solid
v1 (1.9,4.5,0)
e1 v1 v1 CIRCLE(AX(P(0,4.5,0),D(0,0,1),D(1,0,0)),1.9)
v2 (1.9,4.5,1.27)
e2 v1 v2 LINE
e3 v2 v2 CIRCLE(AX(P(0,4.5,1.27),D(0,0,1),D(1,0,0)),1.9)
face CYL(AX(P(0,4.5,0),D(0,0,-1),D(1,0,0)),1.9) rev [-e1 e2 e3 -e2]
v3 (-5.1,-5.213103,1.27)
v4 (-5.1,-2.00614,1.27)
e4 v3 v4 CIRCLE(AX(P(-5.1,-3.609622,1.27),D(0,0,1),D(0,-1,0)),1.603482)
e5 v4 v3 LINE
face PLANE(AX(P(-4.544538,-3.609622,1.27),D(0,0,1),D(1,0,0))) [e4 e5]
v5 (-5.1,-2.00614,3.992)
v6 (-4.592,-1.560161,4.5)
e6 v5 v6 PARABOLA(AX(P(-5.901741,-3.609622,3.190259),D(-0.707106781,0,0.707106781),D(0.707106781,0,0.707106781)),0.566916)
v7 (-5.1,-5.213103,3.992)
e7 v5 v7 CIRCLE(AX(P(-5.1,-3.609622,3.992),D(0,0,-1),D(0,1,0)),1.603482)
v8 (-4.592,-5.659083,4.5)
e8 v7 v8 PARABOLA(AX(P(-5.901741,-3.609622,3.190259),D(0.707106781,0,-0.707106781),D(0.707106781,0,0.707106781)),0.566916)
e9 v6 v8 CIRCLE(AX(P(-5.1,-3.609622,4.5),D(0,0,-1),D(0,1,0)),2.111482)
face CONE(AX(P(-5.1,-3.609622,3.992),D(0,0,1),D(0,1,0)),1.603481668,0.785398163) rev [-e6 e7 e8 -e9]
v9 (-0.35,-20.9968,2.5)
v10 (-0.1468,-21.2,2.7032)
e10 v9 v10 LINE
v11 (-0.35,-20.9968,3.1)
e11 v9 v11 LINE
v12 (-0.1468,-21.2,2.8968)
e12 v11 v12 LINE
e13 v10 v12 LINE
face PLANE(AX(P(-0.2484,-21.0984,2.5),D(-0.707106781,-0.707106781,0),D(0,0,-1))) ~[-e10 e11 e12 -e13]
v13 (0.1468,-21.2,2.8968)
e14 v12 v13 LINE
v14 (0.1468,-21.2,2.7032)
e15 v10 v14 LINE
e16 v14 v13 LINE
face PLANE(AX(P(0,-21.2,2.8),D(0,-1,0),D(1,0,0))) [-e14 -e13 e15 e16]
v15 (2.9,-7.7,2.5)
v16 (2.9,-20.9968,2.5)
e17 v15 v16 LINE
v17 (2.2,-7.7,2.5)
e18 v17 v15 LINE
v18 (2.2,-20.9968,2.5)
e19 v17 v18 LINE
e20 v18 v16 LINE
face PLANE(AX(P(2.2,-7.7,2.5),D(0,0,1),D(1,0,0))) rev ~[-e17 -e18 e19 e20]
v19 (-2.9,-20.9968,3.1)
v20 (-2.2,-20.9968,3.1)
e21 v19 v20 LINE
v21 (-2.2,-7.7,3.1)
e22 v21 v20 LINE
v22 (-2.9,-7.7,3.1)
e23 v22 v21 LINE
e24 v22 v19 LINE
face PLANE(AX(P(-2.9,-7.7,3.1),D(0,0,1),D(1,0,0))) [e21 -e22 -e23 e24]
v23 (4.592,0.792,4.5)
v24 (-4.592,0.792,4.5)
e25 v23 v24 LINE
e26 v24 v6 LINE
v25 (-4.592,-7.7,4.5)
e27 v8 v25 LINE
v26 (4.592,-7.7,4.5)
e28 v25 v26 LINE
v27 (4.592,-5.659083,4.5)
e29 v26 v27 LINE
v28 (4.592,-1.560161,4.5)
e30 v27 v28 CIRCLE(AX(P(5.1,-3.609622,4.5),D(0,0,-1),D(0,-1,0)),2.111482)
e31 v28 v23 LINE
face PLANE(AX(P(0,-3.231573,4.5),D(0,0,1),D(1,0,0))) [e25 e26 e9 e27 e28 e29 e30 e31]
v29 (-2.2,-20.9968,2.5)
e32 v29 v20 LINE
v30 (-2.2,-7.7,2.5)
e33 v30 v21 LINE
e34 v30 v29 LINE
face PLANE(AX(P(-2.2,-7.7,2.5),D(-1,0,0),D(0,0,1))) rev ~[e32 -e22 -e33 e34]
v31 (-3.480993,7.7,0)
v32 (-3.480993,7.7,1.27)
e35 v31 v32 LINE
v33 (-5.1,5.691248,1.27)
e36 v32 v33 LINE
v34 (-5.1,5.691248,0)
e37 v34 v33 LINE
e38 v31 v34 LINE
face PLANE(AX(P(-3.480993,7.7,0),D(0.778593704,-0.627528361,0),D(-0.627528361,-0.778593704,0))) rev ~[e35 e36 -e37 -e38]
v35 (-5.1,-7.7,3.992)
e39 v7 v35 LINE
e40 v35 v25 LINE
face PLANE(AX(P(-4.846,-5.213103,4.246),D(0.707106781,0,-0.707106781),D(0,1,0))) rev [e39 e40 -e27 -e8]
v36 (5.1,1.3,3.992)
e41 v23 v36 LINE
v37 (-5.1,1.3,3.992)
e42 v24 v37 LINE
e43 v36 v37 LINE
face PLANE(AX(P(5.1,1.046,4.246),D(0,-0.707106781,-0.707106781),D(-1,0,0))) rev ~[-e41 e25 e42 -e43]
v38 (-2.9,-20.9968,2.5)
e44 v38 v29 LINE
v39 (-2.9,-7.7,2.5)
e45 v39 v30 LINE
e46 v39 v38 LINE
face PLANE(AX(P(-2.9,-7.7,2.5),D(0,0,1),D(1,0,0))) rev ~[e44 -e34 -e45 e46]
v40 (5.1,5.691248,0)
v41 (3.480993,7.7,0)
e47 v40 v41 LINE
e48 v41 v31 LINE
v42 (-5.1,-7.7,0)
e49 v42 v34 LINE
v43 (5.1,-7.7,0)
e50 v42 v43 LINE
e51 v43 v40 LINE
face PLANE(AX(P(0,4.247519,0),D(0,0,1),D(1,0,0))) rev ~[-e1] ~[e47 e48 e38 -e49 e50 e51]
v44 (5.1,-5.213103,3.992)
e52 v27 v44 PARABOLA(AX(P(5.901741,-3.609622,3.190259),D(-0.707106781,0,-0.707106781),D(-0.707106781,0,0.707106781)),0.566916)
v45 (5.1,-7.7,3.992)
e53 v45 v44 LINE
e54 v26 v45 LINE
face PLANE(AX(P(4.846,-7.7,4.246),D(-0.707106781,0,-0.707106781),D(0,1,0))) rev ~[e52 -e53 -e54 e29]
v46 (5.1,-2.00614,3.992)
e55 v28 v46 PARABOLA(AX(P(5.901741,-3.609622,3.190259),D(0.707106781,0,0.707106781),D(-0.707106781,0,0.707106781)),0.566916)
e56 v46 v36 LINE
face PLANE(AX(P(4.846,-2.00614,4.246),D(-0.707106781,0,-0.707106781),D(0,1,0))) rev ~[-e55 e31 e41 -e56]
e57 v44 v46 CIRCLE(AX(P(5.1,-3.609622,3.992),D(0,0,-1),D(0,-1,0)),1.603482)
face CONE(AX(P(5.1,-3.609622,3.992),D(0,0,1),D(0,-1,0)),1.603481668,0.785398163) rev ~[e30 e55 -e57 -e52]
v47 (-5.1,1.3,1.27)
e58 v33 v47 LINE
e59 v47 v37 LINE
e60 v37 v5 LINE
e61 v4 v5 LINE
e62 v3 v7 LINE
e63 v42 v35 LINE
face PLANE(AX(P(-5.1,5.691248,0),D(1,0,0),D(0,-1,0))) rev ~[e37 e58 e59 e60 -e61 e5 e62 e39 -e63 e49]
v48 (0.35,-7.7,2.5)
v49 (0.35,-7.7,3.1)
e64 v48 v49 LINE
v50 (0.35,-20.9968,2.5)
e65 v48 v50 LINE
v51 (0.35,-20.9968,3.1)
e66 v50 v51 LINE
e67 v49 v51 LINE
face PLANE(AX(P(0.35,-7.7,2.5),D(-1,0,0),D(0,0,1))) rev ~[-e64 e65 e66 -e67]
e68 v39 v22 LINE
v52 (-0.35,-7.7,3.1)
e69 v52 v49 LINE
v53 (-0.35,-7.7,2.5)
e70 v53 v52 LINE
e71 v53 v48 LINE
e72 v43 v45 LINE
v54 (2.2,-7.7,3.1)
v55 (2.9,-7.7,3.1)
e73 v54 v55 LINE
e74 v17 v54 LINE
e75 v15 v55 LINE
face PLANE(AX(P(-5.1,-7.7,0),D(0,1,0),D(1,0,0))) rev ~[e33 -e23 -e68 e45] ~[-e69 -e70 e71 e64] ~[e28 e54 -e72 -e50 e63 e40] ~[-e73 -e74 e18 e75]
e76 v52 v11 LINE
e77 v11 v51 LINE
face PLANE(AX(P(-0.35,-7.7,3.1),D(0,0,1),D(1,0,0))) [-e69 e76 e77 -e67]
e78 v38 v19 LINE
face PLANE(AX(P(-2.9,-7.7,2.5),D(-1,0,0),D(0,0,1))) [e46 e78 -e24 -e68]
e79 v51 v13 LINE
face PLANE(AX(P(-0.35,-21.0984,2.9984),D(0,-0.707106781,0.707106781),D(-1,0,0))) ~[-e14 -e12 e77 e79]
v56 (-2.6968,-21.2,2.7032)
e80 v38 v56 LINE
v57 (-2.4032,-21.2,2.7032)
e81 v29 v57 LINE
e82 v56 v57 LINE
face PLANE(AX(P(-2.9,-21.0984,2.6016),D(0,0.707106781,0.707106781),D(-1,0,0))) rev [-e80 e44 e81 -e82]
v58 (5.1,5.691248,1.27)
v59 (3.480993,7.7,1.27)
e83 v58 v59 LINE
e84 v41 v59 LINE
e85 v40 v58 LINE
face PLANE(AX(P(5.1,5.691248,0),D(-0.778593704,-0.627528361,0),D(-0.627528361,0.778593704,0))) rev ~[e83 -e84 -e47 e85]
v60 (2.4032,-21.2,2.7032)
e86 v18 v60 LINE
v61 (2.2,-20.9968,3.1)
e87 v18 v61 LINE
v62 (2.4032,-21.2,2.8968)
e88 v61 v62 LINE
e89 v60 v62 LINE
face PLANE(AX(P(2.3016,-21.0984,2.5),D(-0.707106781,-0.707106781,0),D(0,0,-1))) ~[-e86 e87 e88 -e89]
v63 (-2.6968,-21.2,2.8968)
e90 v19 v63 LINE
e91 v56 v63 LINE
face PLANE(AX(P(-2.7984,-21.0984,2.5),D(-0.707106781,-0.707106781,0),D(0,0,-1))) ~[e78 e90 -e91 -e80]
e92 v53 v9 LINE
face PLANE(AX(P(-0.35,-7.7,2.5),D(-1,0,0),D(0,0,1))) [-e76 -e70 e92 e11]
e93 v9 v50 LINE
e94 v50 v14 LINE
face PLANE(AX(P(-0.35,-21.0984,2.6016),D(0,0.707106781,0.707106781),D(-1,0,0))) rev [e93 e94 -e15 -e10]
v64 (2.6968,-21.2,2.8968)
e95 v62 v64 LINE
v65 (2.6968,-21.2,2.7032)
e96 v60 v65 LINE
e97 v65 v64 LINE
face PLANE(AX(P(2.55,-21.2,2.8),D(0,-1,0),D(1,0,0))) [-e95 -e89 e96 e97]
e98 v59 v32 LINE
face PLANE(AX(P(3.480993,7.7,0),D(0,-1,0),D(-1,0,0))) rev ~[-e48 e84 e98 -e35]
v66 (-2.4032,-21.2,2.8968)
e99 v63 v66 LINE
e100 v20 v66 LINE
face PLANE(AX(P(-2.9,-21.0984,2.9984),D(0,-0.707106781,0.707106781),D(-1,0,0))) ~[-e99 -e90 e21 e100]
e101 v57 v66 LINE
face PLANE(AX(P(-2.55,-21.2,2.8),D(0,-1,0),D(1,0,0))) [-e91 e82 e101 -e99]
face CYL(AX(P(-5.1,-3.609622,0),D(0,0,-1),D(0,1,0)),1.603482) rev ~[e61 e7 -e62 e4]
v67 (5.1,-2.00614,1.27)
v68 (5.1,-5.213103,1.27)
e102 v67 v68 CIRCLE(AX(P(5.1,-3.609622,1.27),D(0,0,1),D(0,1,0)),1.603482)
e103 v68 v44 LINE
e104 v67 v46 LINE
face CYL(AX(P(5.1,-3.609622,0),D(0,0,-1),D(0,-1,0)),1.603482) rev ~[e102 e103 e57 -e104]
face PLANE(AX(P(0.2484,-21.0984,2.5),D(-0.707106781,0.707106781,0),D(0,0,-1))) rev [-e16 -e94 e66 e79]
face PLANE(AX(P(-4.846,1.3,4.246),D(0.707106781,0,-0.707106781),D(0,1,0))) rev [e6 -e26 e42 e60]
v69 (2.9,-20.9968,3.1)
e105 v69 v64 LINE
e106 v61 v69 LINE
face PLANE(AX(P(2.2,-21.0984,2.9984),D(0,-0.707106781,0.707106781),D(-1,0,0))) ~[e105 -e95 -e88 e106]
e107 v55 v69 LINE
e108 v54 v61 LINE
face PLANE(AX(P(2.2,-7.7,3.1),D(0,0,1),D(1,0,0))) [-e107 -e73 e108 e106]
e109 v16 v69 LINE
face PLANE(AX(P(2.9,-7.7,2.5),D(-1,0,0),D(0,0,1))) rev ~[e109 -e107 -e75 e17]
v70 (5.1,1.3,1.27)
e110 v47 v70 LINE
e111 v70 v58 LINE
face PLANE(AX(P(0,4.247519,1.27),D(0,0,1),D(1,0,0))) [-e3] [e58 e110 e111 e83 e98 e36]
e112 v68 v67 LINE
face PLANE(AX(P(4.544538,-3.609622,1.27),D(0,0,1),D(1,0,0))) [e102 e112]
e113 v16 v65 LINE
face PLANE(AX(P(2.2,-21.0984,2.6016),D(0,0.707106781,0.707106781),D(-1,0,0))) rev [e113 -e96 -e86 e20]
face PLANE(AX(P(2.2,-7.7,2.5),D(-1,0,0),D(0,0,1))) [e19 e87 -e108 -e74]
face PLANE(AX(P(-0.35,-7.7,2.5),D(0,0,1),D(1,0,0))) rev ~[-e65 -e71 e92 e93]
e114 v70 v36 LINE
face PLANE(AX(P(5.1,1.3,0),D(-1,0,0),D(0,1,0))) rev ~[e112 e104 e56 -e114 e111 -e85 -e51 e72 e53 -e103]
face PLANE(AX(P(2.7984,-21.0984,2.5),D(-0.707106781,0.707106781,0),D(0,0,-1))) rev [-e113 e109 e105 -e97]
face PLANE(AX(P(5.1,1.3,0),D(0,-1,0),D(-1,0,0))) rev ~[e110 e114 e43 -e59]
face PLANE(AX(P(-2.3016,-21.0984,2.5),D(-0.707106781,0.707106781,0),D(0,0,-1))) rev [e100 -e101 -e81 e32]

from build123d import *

# Parameters (mm, degrees)
F1_DEPTH = 4.5
F0_R     = 1.9
F2_DEPTH = 1.27
F3_SIZE  = 0.508
F4_W     = 0.7
F4_H     = 0.6
F5_DEPTH = 13.5
F6_SIZE  = 0.2032


with BuildPart() as f1:
    # F0 (on Top) → F1 (new body)
    with BuildSketch(Plane.XY):
        with BuildLine():
            Line((5.1, -2.006139996), (5.1, 1.3))
            Line((5.1, 1.3), (-5.1, 1.3))
            Line((-5.1, 1.3), (-5.1, -2.006139996))
            ThreePointArc((-5.1, -2.006139996), (-3.4965183315, -3.6096216645), (-5.1, -5.213103333))
            Line((-5.1, -5.213103333), (-5.1, -7.7))
            Line((-5.1, -7.7), (5.1, -7.7))
            Line((5.1, -7.7), (5.1, -5.213103333))
            ThreePointArc((5.1, -5.213103333), (3.4965183315, -3.6096216645), (5.1, -2.006139996))
        make_face()
    extrude(amount=F1_DEPTH)

    # F0 (on Top) → F2 (join)
    with BuildSketch(Plane.XY):
        Polygon((5.1, 5.6912479922), (3.4809927456, 7.7), (-3.4809927456, 7.7), (-5.1, 5.6912479922), (-5.1, 1.3), (5.1, 1.3), align=None)
        with Locations((0, 4.5)):
            Circle(F0_R, mode=Mode.SUBTRACT)
        with BuildLine():
            ThreePointArc((-5.1, -5.213103333), (-3.4965183315, -3.6096216645), (-5.1, -2.006139996))
            Line((-5.1, -2.006139996), (-5.1, -5.213103333))
        make_face()
        with BuildLine():
            Line((5.1, -5.213103333), (5.1, -2.006139996))
            ThreePointArc((5.1, -2.006139996), (3.4965183315, -3.6096216645), (5.1, -5.213103333))
        make_face()
    extrude(amount=F2_DEPTH)

    # F3
    f3_edges = [f1.edges().sort_by_distance(p)[0] for p in [
        (-5.1, -6.456552, 4.5),
        (0, 1.3, 4.5),
        (5.1, -0.35307, 4.5),
        (3.496518, -3.609622, 4.5),
        (-3.496518, -3.609622, 4.5),
        (5.1, -6.456552, 4.5),
        (-5.1, -0.35307, 4.5),
    ]]
    chamfer(f3_edges, length=F3_SIZE)

    # F4 (on face) → F5 (join)
    with BuildSketch(Plane.XZ.offset(7.7)):
        with Locations((-2.55, 2.8)):
            Rectangle(F4_W, F4_H)
        with Locations((0, 2.8)):
            Rectangle(F4_W, F4_H)
        with Locations((2.55, 2.8)):
            Rectangle(F4_W, F4_H)
    extrude(amount=F5_DEPTH)

    # F6
    f6_edges = [f1.edges().sort_by_distance(p)[0] for p in [
        (-2.55, -21.2, 3.1),
        (-2.9, -21.2, 2.8),
        (-2.55, -21.2, 2.5),
        (-2.2, -21.2, 2.8),
        (0, -21.2, 3.1),
        (-0.35, -21.2, 2.8),
        (0, -21.2, 2.5),
        (0.35, -21.2, 2.8),
        (2.55, -21.2, 3.1),
        (2.2, -21.2, 2.8),
        (2.55, -21.2, 2.5),
        (2.9, -21.2, 2.8),
    ]]
    chamfer(f6_edges, length=F6_SIZE)


solid = f1.part
